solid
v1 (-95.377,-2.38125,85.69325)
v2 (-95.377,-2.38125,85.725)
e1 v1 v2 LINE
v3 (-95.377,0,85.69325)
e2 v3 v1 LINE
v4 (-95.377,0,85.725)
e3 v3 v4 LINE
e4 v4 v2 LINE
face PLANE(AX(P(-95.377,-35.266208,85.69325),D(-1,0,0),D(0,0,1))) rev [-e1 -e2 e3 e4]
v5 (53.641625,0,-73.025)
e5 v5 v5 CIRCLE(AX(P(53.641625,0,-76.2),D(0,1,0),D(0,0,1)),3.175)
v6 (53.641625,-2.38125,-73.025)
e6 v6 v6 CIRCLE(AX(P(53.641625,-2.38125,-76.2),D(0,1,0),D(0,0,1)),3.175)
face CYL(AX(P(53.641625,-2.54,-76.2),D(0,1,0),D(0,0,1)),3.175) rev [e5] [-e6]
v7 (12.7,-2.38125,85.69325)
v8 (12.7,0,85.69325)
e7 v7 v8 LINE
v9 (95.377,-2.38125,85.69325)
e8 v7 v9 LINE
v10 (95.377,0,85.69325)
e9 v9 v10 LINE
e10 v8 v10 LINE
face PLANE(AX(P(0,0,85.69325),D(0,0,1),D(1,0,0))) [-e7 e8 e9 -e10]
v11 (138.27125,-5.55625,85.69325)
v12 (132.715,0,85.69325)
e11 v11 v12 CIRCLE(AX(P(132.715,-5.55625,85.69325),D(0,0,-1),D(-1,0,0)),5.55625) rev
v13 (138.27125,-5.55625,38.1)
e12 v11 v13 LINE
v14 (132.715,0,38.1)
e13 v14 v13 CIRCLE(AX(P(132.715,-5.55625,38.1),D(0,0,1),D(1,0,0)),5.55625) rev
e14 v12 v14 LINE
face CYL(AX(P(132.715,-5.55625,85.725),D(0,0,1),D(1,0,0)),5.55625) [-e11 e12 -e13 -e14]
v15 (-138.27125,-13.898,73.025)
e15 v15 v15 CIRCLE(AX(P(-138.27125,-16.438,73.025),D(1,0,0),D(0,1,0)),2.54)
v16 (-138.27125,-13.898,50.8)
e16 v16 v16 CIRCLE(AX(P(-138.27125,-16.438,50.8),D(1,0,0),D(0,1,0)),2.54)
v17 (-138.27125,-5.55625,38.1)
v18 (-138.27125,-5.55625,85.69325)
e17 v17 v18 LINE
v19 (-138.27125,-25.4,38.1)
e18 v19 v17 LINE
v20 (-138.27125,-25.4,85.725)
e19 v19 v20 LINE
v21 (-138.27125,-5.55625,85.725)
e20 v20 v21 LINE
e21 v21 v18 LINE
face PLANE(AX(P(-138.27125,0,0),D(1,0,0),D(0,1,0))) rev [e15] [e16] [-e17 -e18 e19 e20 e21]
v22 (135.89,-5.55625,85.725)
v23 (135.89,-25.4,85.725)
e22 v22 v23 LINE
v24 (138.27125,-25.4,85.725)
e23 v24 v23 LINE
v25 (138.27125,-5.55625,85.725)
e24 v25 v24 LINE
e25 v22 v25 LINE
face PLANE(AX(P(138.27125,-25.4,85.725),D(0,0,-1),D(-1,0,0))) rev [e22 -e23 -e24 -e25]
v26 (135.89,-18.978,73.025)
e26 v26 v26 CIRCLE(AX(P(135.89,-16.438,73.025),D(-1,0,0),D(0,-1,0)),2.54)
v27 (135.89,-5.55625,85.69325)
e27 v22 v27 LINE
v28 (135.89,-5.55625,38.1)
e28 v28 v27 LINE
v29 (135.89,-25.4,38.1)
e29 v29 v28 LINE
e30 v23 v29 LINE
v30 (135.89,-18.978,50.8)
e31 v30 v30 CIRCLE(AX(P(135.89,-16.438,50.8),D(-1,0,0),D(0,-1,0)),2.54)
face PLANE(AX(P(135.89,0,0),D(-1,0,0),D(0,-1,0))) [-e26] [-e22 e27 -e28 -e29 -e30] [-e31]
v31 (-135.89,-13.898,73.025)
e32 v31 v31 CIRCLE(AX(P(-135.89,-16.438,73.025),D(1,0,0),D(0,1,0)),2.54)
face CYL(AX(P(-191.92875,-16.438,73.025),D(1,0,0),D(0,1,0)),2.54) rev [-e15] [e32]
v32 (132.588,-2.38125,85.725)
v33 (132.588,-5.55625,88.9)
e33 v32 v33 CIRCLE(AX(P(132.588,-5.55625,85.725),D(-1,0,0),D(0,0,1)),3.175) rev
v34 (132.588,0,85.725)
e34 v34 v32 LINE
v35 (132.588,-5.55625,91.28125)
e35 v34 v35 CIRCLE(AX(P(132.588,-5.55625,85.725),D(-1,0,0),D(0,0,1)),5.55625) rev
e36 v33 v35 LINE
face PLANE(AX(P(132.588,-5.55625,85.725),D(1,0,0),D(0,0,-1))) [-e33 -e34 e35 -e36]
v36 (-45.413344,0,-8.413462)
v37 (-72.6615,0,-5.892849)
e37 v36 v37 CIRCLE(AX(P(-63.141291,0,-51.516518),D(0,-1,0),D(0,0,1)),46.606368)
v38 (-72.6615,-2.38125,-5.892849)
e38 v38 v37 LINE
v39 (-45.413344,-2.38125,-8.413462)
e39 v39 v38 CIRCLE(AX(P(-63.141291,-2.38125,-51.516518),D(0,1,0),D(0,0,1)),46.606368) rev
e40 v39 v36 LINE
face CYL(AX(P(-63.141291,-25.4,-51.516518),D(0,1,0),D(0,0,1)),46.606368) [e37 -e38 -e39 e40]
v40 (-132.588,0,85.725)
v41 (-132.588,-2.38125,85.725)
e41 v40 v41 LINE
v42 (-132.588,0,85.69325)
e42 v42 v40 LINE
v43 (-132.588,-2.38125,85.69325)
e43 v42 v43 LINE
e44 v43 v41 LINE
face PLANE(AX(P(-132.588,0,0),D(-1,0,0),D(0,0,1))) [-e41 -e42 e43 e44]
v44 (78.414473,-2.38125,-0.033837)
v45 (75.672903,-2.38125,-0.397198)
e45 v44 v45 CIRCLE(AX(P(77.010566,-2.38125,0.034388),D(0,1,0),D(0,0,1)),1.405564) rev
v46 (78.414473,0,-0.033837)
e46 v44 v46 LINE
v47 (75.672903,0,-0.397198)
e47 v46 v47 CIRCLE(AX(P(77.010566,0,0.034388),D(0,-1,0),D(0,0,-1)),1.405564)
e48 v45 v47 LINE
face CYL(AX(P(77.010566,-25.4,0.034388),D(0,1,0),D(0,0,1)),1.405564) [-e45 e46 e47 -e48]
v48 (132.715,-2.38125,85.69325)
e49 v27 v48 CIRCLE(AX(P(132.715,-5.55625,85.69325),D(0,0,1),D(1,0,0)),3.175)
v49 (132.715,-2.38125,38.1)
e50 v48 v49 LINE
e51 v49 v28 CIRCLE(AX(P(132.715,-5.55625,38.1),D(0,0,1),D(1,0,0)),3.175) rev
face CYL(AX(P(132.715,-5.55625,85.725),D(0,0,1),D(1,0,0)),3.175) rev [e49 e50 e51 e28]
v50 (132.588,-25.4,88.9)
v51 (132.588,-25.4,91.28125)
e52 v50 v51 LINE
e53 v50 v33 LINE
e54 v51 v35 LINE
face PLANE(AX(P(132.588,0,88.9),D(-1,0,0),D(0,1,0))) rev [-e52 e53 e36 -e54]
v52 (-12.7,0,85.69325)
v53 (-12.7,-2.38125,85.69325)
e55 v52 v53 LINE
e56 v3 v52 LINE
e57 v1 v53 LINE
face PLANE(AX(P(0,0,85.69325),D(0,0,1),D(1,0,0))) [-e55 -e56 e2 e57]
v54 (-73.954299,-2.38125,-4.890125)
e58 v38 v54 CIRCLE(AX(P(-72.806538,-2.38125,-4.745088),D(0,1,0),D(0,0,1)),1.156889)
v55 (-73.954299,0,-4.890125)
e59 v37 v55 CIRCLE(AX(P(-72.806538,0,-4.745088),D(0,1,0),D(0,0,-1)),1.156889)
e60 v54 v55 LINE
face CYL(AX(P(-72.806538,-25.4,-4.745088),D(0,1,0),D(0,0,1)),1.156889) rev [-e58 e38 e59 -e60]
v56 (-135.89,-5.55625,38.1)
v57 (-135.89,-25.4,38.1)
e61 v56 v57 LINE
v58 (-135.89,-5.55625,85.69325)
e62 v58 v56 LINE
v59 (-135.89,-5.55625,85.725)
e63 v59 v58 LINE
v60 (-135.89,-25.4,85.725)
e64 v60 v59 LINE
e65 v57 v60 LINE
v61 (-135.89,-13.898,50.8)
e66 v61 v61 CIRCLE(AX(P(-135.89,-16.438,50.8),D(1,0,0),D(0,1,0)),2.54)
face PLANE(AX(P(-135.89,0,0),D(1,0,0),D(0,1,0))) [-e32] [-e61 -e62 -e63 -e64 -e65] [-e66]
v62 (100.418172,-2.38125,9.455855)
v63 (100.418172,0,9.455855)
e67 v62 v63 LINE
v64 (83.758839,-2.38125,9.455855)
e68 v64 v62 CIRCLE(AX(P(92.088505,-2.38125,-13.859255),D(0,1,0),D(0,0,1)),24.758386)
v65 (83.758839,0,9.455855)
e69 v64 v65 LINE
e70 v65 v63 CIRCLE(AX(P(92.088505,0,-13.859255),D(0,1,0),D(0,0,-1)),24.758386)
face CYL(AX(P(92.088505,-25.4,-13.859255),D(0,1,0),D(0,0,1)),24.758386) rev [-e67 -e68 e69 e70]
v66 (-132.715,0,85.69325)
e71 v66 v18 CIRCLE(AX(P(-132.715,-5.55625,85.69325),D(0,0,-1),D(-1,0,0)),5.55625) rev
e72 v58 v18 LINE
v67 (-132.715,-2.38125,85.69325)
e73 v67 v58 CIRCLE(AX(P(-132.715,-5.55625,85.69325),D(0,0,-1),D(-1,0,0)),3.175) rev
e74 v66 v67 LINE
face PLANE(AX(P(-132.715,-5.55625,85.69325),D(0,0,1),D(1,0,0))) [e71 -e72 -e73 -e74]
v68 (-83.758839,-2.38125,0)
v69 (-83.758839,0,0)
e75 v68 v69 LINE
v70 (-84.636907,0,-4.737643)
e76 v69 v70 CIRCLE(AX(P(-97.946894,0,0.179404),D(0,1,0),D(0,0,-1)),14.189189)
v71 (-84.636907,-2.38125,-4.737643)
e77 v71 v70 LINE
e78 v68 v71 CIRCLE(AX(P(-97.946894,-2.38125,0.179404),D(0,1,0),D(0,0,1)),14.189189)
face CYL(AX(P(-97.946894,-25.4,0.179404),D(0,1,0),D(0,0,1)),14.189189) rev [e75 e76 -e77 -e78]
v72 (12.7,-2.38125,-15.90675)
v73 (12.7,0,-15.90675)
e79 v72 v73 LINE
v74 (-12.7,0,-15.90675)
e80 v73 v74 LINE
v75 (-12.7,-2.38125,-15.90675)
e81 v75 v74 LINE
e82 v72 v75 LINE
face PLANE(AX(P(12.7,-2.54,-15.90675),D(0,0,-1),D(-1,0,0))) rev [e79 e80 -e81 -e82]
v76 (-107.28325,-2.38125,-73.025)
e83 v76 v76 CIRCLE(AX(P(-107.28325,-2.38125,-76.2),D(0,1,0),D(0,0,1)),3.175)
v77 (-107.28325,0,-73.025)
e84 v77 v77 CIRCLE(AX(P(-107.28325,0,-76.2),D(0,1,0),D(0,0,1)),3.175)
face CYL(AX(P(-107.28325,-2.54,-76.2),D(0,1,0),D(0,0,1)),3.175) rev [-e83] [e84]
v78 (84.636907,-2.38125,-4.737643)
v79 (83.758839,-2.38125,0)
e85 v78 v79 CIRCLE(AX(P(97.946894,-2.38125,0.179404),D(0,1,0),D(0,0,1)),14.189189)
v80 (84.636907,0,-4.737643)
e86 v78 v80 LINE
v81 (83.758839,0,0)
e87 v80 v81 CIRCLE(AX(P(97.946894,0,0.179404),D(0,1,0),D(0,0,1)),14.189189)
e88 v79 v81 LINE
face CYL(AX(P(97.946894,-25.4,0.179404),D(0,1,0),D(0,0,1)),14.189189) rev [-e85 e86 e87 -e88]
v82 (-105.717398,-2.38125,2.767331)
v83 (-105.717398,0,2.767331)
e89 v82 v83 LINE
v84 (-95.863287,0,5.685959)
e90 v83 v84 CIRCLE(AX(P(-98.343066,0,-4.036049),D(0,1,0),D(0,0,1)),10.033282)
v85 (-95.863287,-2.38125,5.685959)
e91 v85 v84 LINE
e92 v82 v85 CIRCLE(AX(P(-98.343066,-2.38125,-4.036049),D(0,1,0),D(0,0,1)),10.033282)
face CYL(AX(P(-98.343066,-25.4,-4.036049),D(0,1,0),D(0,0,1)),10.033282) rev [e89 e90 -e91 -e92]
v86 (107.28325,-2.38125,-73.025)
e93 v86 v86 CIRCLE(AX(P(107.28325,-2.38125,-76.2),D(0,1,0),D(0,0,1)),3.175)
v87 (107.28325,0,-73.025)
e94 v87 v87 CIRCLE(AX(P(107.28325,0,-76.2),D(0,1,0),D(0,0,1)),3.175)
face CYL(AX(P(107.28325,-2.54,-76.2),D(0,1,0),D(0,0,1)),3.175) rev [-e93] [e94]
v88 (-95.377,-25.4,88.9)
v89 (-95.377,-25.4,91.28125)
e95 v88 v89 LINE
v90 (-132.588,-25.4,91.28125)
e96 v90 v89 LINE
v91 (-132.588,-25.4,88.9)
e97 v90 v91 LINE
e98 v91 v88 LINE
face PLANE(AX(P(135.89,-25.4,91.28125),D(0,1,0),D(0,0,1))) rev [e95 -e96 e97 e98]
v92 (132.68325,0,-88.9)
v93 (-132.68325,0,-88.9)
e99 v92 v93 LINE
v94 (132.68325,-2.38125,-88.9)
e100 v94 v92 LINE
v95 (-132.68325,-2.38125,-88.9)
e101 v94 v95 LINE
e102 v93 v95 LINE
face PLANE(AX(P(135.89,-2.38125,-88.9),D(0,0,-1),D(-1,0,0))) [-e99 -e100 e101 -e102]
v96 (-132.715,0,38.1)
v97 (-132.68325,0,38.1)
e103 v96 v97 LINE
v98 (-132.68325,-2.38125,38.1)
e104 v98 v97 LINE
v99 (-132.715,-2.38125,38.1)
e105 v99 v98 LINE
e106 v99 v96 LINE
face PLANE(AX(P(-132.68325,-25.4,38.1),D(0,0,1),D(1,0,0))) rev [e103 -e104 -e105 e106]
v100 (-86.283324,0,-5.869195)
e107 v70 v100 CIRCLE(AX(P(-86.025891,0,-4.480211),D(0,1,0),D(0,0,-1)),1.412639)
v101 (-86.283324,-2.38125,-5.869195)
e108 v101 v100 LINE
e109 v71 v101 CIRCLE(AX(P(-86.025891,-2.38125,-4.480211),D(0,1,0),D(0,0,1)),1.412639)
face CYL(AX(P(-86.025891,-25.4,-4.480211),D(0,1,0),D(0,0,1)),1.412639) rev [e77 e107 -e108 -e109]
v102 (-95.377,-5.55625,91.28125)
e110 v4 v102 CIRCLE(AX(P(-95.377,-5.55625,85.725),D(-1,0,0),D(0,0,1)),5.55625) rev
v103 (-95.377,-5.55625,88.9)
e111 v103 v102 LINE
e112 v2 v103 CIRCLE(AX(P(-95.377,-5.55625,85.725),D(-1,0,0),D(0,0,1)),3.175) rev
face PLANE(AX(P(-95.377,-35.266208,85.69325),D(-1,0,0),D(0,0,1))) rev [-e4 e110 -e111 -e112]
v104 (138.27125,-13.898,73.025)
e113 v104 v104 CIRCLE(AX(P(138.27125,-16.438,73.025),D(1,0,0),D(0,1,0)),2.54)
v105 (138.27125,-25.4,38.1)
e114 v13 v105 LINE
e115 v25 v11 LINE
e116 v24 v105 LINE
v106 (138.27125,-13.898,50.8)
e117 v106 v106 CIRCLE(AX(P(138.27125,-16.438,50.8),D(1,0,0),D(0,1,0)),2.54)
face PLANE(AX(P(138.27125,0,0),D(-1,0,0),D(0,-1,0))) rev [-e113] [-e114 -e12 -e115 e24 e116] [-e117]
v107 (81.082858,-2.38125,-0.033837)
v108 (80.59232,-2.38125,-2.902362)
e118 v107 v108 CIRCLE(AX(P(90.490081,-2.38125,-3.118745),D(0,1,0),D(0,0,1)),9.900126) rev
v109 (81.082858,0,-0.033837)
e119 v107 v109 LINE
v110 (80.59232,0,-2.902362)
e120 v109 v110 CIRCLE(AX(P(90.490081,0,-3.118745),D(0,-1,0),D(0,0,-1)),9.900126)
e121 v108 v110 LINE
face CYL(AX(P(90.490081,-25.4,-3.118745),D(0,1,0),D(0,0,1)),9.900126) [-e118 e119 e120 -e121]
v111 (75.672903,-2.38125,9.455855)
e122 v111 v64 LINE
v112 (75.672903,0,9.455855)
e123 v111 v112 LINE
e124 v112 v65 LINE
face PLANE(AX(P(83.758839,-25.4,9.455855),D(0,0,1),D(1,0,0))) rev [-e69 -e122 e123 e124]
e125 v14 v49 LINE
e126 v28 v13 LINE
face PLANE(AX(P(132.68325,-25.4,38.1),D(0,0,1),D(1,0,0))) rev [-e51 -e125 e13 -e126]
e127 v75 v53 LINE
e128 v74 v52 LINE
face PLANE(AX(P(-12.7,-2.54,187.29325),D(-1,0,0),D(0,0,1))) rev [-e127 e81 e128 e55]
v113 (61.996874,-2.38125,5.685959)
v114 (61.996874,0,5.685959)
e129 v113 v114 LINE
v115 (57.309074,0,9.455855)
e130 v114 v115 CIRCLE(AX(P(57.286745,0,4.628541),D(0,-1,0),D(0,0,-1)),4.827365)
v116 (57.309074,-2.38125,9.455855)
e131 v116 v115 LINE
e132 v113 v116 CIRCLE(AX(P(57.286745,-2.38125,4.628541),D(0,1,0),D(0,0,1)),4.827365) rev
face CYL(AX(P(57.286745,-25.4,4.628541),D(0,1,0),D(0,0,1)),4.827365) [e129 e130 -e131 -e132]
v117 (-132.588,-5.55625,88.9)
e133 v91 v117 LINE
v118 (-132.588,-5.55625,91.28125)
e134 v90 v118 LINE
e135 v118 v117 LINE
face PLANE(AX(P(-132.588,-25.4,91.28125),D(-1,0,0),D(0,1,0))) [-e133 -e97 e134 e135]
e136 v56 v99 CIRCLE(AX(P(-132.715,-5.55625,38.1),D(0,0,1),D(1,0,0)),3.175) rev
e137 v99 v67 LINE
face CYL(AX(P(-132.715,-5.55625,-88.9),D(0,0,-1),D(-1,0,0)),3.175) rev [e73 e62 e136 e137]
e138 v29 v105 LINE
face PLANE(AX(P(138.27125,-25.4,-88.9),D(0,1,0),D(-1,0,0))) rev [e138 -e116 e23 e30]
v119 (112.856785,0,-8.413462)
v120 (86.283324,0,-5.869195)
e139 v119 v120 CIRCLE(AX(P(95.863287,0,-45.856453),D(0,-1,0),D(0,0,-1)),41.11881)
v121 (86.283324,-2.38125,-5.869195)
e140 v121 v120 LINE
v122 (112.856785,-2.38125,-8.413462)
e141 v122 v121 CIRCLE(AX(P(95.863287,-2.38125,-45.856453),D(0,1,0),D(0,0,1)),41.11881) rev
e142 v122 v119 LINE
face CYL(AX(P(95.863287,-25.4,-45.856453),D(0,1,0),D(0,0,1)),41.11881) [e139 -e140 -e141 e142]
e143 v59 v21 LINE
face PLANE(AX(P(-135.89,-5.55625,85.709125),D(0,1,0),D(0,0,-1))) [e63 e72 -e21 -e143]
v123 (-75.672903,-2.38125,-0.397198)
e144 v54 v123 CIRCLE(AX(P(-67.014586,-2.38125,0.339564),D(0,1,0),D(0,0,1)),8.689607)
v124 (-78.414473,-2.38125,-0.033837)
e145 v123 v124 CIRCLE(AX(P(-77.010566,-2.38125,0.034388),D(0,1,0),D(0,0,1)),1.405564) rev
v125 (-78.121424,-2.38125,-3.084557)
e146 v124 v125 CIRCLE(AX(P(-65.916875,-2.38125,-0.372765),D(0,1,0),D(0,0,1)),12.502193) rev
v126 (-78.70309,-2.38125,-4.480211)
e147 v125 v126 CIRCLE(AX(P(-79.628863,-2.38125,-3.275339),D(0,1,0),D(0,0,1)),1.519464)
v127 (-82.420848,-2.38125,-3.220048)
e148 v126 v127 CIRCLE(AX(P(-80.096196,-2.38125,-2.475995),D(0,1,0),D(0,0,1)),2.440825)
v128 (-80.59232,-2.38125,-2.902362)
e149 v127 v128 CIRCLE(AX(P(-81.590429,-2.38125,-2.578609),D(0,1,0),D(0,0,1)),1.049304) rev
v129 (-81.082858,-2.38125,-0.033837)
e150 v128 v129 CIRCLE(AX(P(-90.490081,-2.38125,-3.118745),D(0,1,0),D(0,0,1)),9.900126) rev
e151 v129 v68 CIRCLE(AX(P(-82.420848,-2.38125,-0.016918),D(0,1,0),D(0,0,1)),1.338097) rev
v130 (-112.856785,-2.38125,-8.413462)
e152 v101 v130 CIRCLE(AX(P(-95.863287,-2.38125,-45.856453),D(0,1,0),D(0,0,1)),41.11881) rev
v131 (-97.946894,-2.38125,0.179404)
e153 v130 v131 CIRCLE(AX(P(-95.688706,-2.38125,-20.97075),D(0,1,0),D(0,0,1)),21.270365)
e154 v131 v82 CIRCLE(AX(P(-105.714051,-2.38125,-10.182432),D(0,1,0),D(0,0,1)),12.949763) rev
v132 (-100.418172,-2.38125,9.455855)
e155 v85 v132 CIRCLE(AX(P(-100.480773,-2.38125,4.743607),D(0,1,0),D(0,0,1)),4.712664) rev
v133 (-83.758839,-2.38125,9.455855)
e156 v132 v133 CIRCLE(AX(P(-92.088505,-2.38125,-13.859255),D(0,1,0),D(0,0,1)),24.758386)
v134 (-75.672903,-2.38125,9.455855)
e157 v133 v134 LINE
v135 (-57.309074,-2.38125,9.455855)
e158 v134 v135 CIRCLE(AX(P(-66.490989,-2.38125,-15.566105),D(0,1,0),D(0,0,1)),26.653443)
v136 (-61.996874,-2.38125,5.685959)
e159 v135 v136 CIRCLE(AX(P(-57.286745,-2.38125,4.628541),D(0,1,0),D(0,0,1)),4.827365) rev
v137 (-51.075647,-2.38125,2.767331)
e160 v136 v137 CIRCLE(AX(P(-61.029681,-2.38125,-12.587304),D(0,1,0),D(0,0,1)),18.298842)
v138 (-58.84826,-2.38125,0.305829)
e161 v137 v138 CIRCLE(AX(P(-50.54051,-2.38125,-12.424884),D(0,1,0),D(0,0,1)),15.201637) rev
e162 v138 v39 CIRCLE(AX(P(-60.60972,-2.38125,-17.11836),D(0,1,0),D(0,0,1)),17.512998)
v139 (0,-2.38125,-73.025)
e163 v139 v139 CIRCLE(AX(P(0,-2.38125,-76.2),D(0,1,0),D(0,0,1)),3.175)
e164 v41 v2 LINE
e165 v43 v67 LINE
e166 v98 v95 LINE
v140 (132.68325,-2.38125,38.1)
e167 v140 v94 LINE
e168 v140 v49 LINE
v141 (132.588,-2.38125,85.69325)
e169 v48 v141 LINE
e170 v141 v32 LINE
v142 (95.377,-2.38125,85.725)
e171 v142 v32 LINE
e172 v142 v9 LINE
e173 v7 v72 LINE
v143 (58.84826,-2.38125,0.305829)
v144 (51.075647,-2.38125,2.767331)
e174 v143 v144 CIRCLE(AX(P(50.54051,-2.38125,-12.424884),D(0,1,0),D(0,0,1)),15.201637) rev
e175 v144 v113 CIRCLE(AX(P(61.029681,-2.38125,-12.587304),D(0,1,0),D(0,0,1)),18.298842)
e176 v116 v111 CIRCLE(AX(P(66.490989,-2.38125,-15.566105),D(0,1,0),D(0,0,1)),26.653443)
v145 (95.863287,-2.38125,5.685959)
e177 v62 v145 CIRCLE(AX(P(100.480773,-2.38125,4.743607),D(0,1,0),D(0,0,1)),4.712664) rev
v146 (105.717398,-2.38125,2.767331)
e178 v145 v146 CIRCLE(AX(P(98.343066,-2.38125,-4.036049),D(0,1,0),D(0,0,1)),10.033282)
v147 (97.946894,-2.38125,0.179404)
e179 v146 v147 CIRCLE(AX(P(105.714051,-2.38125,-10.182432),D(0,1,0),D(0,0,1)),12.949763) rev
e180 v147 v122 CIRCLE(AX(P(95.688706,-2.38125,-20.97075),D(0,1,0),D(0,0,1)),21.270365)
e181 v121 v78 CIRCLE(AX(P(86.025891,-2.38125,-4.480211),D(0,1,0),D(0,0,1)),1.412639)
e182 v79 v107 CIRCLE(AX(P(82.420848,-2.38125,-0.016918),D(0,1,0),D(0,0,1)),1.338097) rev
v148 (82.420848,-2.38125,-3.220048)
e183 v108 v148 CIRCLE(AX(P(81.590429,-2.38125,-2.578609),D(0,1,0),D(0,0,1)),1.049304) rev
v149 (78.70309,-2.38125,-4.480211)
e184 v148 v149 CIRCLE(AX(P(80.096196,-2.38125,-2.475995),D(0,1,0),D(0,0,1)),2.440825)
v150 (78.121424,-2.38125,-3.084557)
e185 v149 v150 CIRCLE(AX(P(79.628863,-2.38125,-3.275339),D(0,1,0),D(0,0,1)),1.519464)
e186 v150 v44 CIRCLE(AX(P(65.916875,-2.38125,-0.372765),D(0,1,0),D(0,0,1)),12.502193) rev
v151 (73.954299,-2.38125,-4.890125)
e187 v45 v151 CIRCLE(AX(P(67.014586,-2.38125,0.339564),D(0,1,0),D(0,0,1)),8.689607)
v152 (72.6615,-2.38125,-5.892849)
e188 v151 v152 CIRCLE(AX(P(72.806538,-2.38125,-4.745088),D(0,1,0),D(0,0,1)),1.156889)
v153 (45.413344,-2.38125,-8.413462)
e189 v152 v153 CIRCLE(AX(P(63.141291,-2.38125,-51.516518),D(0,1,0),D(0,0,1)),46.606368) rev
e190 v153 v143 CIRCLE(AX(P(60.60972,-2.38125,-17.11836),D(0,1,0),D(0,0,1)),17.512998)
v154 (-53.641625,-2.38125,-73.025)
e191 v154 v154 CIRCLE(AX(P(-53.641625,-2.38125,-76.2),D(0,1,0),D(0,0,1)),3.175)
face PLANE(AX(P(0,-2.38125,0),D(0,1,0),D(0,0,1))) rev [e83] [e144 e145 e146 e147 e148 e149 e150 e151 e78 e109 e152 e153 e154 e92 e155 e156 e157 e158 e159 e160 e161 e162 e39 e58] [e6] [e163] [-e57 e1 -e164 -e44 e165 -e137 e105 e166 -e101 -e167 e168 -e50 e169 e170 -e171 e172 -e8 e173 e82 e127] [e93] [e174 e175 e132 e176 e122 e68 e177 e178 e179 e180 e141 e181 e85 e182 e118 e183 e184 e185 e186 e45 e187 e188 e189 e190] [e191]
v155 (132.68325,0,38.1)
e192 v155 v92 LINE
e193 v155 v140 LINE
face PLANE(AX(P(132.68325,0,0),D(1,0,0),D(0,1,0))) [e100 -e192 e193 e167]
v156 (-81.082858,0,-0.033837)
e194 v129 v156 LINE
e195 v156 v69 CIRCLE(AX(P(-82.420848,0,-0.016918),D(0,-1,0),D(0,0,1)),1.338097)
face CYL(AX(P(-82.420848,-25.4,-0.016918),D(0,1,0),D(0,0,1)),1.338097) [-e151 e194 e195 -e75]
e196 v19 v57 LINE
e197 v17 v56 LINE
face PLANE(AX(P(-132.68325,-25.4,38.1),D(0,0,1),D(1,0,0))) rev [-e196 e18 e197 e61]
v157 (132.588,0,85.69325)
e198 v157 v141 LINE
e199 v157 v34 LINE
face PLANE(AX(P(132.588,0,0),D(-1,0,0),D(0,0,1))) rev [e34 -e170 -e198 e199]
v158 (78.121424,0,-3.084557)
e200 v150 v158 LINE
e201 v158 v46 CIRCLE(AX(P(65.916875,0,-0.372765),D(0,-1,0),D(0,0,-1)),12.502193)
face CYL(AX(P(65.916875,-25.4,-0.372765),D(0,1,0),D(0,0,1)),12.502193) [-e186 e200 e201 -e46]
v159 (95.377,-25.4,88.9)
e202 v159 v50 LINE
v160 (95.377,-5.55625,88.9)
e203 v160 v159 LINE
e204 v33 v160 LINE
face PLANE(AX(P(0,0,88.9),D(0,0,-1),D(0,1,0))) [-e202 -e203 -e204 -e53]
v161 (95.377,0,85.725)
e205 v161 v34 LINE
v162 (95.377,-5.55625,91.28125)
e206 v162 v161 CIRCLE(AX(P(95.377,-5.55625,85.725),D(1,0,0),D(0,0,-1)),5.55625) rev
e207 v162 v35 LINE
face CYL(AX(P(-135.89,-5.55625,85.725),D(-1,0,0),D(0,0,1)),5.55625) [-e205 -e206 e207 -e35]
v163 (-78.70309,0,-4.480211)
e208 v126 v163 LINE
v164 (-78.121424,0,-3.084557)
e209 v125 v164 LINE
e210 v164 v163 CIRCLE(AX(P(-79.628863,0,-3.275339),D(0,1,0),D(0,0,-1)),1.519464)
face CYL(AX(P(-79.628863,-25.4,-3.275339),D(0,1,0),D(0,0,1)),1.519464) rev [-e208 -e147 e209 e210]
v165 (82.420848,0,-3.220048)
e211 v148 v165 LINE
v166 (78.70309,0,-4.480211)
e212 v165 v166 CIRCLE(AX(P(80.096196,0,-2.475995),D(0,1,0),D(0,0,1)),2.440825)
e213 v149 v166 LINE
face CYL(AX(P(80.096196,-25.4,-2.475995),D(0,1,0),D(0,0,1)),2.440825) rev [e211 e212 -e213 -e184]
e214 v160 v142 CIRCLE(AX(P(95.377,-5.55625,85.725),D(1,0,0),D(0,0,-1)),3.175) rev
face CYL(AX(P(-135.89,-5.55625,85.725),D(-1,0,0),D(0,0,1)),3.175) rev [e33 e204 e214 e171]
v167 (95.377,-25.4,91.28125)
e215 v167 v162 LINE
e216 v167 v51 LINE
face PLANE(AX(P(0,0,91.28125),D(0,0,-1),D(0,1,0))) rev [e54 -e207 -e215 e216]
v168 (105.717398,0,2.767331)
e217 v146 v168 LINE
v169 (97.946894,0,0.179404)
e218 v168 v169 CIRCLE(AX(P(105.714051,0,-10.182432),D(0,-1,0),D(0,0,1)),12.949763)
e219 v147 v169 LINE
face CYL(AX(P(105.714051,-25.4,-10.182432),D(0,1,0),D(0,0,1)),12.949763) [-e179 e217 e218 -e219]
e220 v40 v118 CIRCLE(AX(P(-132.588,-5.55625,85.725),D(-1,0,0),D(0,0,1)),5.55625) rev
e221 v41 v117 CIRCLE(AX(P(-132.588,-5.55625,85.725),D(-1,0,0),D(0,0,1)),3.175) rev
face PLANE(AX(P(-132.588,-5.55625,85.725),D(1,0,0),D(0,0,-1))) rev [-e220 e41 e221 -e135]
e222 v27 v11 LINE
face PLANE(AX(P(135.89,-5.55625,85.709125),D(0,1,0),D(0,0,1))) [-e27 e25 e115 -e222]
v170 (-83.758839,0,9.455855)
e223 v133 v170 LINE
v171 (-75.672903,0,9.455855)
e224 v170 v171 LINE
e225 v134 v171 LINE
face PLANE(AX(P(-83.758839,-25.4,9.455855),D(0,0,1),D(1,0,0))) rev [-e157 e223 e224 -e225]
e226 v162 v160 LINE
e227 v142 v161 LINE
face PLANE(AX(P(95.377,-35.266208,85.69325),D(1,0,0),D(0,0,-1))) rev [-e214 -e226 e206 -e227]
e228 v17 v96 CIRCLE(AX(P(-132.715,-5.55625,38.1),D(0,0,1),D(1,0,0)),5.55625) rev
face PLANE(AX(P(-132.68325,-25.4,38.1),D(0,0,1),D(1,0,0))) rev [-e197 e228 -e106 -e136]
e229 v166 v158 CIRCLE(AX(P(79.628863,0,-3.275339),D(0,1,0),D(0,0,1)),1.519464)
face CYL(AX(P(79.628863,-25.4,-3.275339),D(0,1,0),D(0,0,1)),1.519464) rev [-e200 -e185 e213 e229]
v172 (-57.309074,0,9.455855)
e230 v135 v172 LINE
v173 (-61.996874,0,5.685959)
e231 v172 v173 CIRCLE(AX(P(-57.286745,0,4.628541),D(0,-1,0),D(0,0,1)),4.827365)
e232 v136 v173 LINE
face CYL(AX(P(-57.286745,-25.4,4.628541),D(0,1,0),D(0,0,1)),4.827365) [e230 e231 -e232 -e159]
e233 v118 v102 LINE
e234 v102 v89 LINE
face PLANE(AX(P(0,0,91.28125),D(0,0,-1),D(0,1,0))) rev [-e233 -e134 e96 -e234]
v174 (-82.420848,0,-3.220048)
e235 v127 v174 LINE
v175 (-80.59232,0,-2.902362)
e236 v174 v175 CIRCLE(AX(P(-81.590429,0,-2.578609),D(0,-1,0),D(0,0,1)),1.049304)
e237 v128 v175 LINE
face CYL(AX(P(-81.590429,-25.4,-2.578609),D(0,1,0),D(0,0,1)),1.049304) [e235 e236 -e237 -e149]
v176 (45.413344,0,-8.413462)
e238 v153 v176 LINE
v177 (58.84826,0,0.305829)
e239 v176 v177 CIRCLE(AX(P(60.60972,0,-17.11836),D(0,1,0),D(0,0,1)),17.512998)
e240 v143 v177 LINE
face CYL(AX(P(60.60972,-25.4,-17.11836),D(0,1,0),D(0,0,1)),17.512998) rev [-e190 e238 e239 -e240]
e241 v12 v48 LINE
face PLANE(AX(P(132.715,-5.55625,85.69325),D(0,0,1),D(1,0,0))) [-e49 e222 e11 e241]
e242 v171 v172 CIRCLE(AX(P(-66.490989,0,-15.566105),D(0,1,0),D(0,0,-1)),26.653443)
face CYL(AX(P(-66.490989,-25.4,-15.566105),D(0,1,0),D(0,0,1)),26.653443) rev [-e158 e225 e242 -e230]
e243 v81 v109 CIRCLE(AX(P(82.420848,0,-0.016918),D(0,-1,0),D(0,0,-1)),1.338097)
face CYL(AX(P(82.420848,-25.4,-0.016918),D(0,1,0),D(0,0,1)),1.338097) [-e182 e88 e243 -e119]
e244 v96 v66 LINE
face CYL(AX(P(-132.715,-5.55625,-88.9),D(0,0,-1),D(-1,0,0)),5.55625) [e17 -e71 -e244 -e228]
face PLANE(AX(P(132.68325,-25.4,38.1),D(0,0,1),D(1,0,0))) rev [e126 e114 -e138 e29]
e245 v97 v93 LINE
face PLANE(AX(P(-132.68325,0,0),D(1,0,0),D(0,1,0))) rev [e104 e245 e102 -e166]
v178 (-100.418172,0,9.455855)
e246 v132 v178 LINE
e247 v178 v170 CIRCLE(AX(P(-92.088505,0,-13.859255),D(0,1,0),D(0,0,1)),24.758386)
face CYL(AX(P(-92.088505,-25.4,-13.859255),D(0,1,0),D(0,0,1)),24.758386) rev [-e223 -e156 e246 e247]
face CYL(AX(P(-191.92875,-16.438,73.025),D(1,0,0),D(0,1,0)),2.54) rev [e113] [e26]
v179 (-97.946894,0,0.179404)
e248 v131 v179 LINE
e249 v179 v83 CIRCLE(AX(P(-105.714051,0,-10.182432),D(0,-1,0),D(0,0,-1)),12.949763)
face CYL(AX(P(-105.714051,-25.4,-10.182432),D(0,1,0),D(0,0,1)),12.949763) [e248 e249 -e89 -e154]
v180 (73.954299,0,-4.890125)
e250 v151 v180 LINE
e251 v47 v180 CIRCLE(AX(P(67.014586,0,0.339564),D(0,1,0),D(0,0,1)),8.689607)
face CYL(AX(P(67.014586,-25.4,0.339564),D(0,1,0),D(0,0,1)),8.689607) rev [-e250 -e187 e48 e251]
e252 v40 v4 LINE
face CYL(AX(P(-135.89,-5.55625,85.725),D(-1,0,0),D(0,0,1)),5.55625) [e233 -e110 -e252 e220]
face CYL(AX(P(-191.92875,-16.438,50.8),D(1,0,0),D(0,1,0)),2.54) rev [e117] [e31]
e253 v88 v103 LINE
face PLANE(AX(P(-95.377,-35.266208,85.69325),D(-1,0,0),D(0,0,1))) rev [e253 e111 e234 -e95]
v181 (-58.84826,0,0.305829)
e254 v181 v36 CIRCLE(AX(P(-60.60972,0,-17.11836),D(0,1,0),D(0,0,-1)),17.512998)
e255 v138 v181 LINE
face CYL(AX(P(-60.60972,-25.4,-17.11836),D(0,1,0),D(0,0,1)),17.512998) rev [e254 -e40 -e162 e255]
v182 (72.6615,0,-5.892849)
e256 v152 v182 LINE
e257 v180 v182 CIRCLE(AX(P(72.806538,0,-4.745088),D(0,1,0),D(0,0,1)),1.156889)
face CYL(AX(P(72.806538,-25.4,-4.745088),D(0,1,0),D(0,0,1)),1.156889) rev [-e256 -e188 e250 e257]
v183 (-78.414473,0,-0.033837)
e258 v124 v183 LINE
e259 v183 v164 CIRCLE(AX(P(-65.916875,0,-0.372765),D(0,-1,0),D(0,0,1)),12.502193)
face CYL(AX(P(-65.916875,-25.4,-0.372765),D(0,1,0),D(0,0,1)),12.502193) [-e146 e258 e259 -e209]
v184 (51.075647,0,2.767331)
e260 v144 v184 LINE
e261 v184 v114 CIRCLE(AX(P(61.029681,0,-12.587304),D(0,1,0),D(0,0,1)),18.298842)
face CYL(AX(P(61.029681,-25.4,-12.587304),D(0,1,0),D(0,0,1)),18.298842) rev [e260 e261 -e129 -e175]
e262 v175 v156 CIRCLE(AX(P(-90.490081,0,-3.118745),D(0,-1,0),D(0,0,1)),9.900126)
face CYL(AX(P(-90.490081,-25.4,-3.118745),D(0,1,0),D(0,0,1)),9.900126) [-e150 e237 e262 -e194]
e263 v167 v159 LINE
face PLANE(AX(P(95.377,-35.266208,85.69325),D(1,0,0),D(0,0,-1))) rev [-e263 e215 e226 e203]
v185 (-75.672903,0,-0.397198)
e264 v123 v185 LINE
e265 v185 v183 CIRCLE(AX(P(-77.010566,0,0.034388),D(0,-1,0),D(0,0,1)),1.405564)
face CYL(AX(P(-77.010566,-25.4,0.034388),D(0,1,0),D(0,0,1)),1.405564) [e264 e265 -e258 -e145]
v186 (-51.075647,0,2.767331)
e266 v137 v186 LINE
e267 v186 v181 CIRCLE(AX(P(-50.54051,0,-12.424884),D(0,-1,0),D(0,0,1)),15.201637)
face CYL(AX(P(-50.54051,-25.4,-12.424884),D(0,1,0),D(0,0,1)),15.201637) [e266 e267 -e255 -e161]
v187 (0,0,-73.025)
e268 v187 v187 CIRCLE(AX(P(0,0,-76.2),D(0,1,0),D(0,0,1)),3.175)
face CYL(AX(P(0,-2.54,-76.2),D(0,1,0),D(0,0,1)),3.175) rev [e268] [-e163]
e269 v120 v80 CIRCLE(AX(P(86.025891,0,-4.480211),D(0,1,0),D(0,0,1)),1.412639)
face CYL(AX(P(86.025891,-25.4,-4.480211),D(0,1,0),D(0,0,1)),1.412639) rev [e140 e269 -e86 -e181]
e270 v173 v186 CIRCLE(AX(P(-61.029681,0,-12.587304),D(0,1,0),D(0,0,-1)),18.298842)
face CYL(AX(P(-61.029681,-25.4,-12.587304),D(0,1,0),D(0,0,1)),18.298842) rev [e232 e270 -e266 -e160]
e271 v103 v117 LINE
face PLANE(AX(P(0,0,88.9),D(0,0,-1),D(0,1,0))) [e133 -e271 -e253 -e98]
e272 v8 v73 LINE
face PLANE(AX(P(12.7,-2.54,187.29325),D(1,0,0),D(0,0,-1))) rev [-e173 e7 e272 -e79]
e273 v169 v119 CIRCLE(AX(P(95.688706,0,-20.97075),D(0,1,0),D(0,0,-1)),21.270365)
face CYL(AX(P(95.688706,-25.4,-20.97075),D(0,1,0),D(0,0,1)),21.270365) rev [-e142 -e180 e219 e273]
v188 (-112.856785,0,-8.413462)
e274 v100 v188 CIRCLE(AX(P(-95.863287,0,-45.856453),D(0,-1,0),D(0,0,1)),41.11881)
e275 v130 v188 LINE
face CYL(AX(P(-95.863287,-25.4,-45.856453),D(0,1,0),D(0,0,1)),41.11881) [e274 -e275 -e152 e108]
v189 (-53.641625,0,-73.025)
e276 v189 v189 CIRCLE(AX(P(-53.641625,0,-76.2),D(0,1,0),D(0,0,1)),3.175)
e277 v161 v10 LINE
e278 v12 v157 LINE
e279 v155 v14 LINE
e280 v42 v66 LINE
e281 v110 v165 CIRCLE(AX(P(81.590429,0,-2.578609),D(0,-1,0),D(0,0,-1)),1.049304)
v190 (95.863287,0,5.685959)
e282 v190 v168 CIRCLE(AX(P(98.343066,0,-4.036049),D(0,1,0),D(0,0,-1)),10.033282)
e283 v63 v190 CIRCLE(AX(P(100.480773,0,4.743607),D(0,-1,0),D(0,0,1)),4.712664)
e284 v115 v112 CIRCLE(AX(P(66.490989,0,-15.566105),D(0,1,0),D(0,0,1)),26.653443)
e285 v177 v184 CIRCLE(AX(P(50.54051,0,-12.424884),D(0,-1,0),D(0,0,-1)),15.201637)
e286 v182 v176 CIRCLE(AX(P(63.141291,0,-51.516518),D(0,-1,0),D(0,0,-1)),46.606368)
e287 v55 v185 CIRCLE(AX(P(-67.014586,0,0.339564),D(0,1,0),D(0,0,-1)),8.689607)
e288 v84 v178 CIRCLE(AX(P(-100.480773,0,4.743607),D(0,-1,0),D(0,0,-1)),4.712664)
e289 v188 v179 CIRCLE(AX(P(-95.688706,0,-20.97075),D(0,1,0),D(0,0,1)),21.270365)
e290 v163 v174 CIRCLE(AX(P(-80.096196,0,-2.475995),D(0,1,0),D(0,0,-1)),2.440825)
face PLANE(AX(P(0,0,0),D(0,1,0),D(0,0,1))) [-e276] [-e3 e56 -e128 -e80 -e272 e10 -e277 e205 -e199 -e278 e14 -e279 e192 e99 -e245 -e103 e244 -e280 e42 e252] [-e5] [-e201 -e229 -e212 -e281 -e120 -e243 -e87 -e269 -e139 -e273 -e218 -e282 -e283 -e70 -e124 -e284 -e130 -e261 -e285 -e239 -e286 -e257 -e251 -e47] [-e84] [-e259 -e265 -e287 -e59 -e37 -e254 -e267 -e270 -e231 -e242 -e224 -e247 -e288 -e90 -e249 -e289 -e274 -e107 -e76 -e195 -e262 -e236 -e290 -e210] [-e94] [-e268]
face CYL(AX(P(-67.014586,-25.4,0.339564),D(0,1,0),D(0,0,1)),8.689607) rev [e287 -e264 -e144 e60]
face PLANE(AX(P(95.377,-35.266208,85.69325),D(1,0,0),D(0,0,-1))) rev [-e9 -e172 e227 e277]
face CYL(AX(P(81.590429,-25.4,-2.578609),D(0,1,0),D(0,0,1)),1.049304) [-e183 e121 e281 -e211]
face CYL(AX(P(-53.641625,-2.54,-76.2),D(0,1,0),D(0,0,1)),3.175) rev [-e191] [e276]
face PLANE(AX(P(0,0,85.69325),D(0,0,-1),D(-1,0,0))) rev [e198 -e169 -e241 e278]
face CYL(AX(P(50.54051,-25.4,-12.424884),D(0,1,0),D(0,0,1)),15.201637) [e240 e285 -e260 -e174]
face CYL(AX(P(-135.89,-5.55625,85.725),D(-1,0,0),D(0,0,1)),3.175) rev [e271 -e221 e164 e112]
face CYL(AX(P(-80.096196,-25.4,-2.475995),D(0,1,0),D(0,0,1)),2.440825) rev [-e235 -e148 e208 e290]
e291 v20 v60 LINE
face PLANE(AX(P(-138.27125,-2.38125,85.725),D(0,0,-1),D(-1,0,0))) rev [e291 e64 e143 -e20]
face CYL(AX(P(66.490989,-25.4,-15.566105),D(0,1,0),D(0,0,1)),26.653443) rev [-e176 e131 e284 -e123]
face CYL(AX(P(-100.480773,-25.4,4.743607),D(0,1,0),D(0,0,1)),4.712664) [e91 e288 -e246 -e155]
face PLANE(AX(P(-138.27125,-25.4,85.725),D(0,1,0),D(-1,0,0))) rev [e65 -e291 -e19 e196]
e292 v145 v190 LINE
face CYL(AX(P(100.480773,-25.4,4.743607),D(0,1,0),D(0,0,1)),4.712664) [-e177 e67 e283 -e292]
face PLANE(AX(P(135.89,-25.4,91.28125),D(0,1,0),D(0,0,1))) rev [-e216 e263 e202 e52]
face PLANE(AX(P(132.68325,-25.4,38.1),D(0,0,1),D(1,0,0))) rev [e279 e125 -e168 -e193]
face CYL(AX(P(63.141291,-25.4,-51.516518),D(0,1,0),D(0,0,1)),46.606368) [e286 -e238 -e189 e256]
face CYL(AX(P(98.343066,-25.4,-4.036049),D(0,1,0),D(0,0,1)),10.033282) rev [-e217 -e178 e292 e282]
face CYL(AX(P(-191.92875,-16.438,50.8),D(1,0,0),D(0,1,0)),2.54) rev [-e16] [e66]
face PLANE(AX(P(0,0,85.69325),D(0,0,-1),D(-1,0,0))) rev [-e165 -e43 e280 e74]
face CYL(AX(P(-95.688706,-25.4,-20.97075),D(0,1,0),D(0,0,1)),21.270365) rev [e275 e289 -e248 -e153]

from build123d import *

# Parameters (mm, degrees)
SKETCH1_W                    = 271.78
SKETCH1_H                    = 177.8
BASE_FLANGE1_DEPTH           = 2.38125
EDGE_FLANGE1_STRIP_W         = 15.875
EDGE_FLANGE1_STRIP_H         = 2.38125
EDGE_FLANGE1_STRIP_CUT_DEPTH = 271.78
EDGE_FLANGE1_DEPTH           = 271.78
EDGE_FLANGE2_STRIP_W         = 15.875
EDGE_FLANGE2_STRIP_H         = 2.38125
EDGE_FLANGE2_STRIP_CUT_DEPTH = 174.625
EDGE_FLANGE2_DEPTH           = 174.625
SKETCH14_W                   = 127
SKETCH14_H                   = 30.097595223
CUT_EXTRUDE1_DEPTH           = 5.588
EDGE_FLANGE3_STRIP_W         = 15.875
EDGE_FLANGE3_STRIP_H         = 2.38125
EDGE_FLANGE3_STRIP_CUT_DEPTH = 174.625
EDGE_FLANGE3_DEPTH           = 174.625
SKETCH18_W                   = 127
SKETCH18_H                   = 45.504454023
CUT_EXTRUDE2_DEPTH           = 5.588
CUT_EXTRUDE3_START           = -3.302
CUT_EXTRUDE3_DEPTH           = 5.68325
CUT_EXTRUDE4_START           = -3.302
CUT_EXTRUDE4_DEPTH           = 5.68325
SKETCH24_W                   = 190.754
SKETCH24_H                   = 70.532416994
CUT_EXTRUDE5_DEPTH           = 5.588
SKETCH25_W                   = 25.4
SKETCH25_H                   = 203.2
CUT_EXTRUDE6_DEPTH           = 2.54
CUT_EXTRUDE7_DEPTH           = 168.619704027
SKETCH28_R                   = 3.175
CUT_EXTRUDE8_DEPTH           = 2.54
SKETCH29_R                   = 2.54
CUT_EXTRUDE9_DEPTH           = 330.2


# Read off the part's stored shape, not the designer's step: Cut-Extrude3, Cut-Extrude4
# Sheet-metal steps are written as plain solids
with BuildPart() as part:
    # Sketch1 → Base-Flange1 (new body)
    with BuildSketch(Plane(origin=(0, 0, 0), x_dir=(1, 0, 0), z_dir=(0, 1, 0))):
        Rectangle(SKETCH1_W, SKETCH1_H)
    extrude(amount=-BASE_FLANGE1_DEPTH)

    # Edge-Flange1 strip (across the edge) → Edge-Flange1 strip cut (cut)
    with BuildSketch(Plane(origin=(135.89, -2.38125, 88.9), x_dir=(0, 0, -1), z_dir=(-1, 0, 0))):
        with Locations((-4.7625, -1.190625)):
            Rectangle(EDGE_FLANGE1_STRIP_W, EDGE_FLANGE1_STRIP_H)
    extrude(amount=EDGE_FLANGE1_STRIP_CUT_DEPTH, mode=Mode.SUBTRACT)

    # Edge-Flange1 section (across the edge) → Edge-Flange1 (add)
    with BuildSketch(Plane(origin=(135.89, -2.38125, 88.9), x_dir=(0, 0, -1), z_dir=(-1, 0, 0))):
        with BuildLine():
            Line((-2.38125, 3.175), (-2.38125, 23.01875))
            Line((-2.38125, 23.01875), (0, 23.01875))
            Line((0, 23.01875), (0, 3.175))
            ThreePointArc((0, 3.175), (0.92993597, 0.92993597), (3.175, 0))
            Line((3.175, 0), (3.175, -2.38125))
            ThreePointArc((3.175, -2.38125), (-0.753862053, -0.753862053), (-2.38125, 3.175))
        make_face()
    extrude(amount=EDGE_FLANGE1_DEPTH)

    # Edge-Flange2 strip (across the edge) → Edge-Flange2 strip cut (cut)
    with BuildSketch(Plane(origin=(135.89, -2.38125, -88.9), x_dir=(-1, 0, 0), z_dir=(0, 0, 1))):
        with Locations((-4.7625, -1.190625)):
            Rectangle(EDGE_FLANGE2_STRIP_W, EDGE_FLANGE2_STRIP_H)
    extrude(amount=EDGE_FLANGE2_STRIP_CUT_DEPTH, mode=Mode.SUBTRACT)

    # Edge-Flange2 section (across the edge) → Edge-Flange2 (add)
    with BuildSketch(Plane(origin=(135.89, -2.38125, -88.9), x_dir=(-1, 0, 0), z_dir=(0, 0, 1))):
        with BuildLine():
            Line((-2.38125, 3.175), (-2.38125, 23.01875))
            Line((-2.38125, 23.01875), (0, 23.01875))
            Line((0, 23.01875), (0, 3.175))
            ThreePointArc((0, 3.175), (0.92993597, 0.92993597), (3.175, 0))
            Line((3.175, 0), (3.175, -2.38125))
            ThreePointArc((3.175, -2.38125), (-0.753862053, -0.753862053), (-2.38125, 3.175))
        make_face()
    extrude(amount=EDGE_FLANGE2_DEPTH)

    # Sketch14 → Cut-Extrude1 (cut)
    with BuildSketch(Plane(origin=(138.27125, 0, 0), x_dir=(0, 0, -1), z_dir=(1, 0, 0))):
        with Locations((25.4, -10.351202389)):
            Rectangle(SKETCH14_W, SKETCH14_H)
    extrude(amount=-CUT_EXTRUDE1_DEPTH, mode=Mode.SUBTRACT)

    # Edge-Flange3 strip (across the edge) → Edge-Flange3 strip cut (cut)
    with BuildSketch(Plane(origin=(-135.89, -2.38125, 85.725), x_dir=(1, 0, 0), z_dir=(0, 0, -1))):
        with Locations((-4.7625, -1.190625)):
            Rectangle(EDGE_FLANGE3_STRIP_W, EDGE_FLANGE3_STRIP_H)
    extrude(amount=EDGE_FLANGE3_STRIP_CUT_DEPTH, mode=Mode.SUBTRACT)

    # Edge-Flange3 section (across the edge) → Edge-Flange3 (add)
    with BuildSketch(Plane(origin=(-135.89, -2.38125, 85.725), x_dir=(1, 0, 0), z_dir=(0, 0, -1))):
        with BuildLine():
            Line((-2.38125, 3.175), (-2.38125, 23.01875))
            Line((-2.38125, 23.01875), (0, 23.01875))
            Line((0, 23.01875), (0, 3.175))
            ThreePointArc((0, 3.175), (0.92993597, 0.92993597), (3.175, 0))
            Line((3.175, 0), (3.175, -2.38125))
            ThreePointArc((3.175, -2.38125), (-0.753862053, -0.753862053), (-2.38125, 3.175))
        make_face()
    extrude(amount=EDGE_FLANGE3_DEPTH)

    # Sketch18 → Cut-Extrude2 (cut)
    with BuildSketch(Plane.ZY.offset(138.27125)):
        with Locations((-25.4, -2.647772988)):
            Rectangle(SKETCH18_W, SKETCH18_H)
    extrude(amount=-CUT_EXTRUDE2_DEPTH, mode=Mode.SUBTRACT)

    # Cut-Extrude3 outline → Cut-Extrude3 (cut)
    with BuildSketch(Plane.ZY.offset(135.89).offset(CUT_EXTRUDE3_START)):
        with BuildLine():
            Line((85.725, 0), (85.69325, 0))
            Line((85.69325, 0), (85.69325, -5.55625))
            Line((85.69325, -5.55625), (85.725, -5.55625))
            Line((85.725, -5.55625), (85.725, -2.38125))
            ThreePointArc((85.725, -2.38125), (87.97006403, -3.31118597), (88.9, -5.55625))
            Line((88.9, -5.55625), (88.9, -25.4))
            Line((88.9, -25.4), (91.28125, -25.4))
            Line((91.28125, -25.4), (91.28125, -5.55625))
            ThreePointArc((91.28125, -5.55625), (89.653862053, -1.627387947), (85.725, 0))
        make_face()
    extrude(amount=CUT_EXTRUDE3_DEPTH, mode=Mode.SUBTRACT)

    # Cut-Extrude4 outline → Cut-Extrude4 (cut)
    with BuildSketch(Plane(origin=(135.89, 0, 0), x_dir=(0, 0, -1), z_dir=(1, 0, 0)).offset(CUT_EXTRUDE4_START)):
        with BuildLine():
            Line((-85.69325, 0), (-85.725, 0))
            ThreePointArc((-85.725, 0), (-89.653862053, -1.627387947), (-91.28125, -5.55625))
            Line((-91.28125, -5.55625), (-91.28125, -25.4))
            Line((-91.28125, -25.4), (-88.9, -25.4))
            Line((-88.9, -25.4), (-88.9, -5.55625))
            ThreePointArc((-88.9, -5.55625), (-87.97006403, -3.31118597), (-85.725, -2.38125))
            Line((-85.725, -2.38125), (-85.725, -5.55625))
            Line((-85.725, -5.55625), (-85.69325, -5.55625))
            Line((-85.69325, -5.55625), (-85.69325, 0))
        make_face()
    extrude(amount=CUT_EXTRUDE4_DEPTH, mode=Mode.SUBTRACT)

    # Sketch24 → Cut-Extrude5 (cut)
    with BuildSketch(Plane.XY.offset(91.28125)):
        Rectangle(SKETCH24_W, SKETCH24_H)
    extrude(amount=-CUT_EXTRUDE5_DEPTH, mode=Mode.SUBTRACT)

    # Sketch25 → Cut-Extrude6 (cut)
    with BuildSketch(Plane(origin=(0, 0, 0), x_dir=(1, 0, 0), z_dir=(0, 1, 0))):
        with Locations((0, -85.69325)):
            Rectangle(SKETCH25_W, SKETCH25_H)
    extrude(amount=-CUT_EXTRUDE6_DEPTH, mode=Mode.SUBTRACT)

    # Sketch27 → Cut-Extrude7 (cut, through all)
    with BuildSketch(Plane(origin=(0, 0, 0), x_dir=(1, 0, 0), z_dir=(0, 1, 0))):
        with BuildLine():
            Line((-83.758838792, -9.45585461), (-75.67290259, -9.45585461))
            ThreePointArc((-75.67290259, -9.45585461), (-66.490988533, -11.087337706), (-57.309074476, -9.45585461))
            ThreePointArc((-57.309074476, -9.45585461), (-60.311983549, -8.390373583), (-61.996874262, -5.685959414))
            ThreePointArc((-61.996874262, -5.685959414), (-56.305231118, -5.091134548), (-51.075646545, -2.767330875))
            ThreePointArc((-51.075646545, -2.767330875), (-55.130053613, -2.067384812), (-58.848260419, -0.305828877))
            ThreePointArc((-58.848260419, -0.305828877), (-51.075646545, 2.428004784), (-45.41334394, 8.413462337))
            ThreePointArc((-45.41334394, 8.413462337), (-58.848260419, 5.108292363), (-72.661500429, 5.892849412))
            ThreePointArc((-72.661500429, 5.892849412), (-73.515570568, 5.659234682), (-73.954298796, 4.890125335))
            ThreePointArc((-73.954298796, 4.890125335), (-75.13069526, 2.764954432), (-75.67290259, 0.397197853))
            ThreePointArc((-75.67290259, 0.397197853), (-76.825891015, -1.427766493), (-78.414472909, 0.033836989))
            ThreePointArc((-78.414472909, 0.033836989), (-78.361782981, 1.568210714), (-78.121423666, 3.084557099))
            ThreePointArc((-78.121423666, 3.084557099), (-78.226332012, 3.859871666), (-78.703089746, 4.480210688))
            ThreePointArc((-78.703089746, 4.480210688), (-80.87974367, 4.787634603), (-82.4208484, 3.22004793))
            ThreePointArc((-82.4208484, 3.22004793), (-81.410815763, 3.612426431), (-80.592319592, 2.902362466))
            ThreePointArc((-80.592319592, 2.902362466), (-80.7316121, 1.449976952), (-81.082858007, 0.033836989))
            ThreePointArc((-81.082858007, 0.033836989), (-82.403929905, -1.321071898), (-83.758838792, 0))
            ThreePointArc((-83.758838792, 0), (-83.995302952, 2.406365651), (-84.636907307, 4.737643154))
            ThreePointArc((-84.636907307, 4.737643154), (-85.225763559, 5.644402971), (-86.283323823, 5.869194738))
            ThreePointArc((-86.283323823, 5.869194738), (-99.782272929, 4.924826167), (-112.856785411, 8.413462337))
            ThreePointArc((-112.856785411, 8.413462337), (-106.309643061, 2.541856444), (-97.946894022, -0.179403782))
            ThreePointArc((-97.946894022, -0.179403782), (-101.622165605, -2.103854793), (-105.71739849, -2.767330875))
            ThreePointArc((-105.71739849, -2.767330875), (-101.192410266, -5.584137657), (-95.863287335, -5.685959414))
            ThreePointArc((-95.863287335, -5.685959414), (-97.475971718, -8.374084711), (-100.418171986, -9.45585461))
            ThreePointArc((-100.418171986, -9.45585461), (-92.088505389, -10.899131081), (-83.758838792, -9.45585461))
        make_face()
        with BuildLine():
            Line((83.758838792, -9.45585461), (75.67290259, -9.45585461))
            ThreePointArc((75.67290259, -9.45585461), (66.490988533, -11.087337706), (57.309074476, -9.45585461))
            ThreePointArc((57.309074476, -9.45585461), (60.311983549, -8.390373583), (61.996874262, -5.685959414))
            ThreePointArc((61.996874262, -5.685959414), (56.305231118, -5.091134548), (51.075646545, -2.767330875))
            ThreePointArc((51.075646545, -2.767330875), (55.130053613, -2.067384812), (58.848260419, -0.305828877))
            ThreePointArc((58.848260419, -0.305828877), (51.075646545, 2.428004784), (45.41334394, 8.413462337))
            ThreePointArc((45.41334394, 8.413462337), (58.848260419, 5.108292363), (72.661500429, 5.892849412))
            ThreePointArc((72.661500429, 5.892849412), (73.515570568, 5.659234682), (73.954298796, 4.890125335))
            ThreePointArc((73.954298796, 4.890125335), (75.13069526, 2.764954432), (75.67290259, 0.397197853))
            ThreePointArc((75.67290259, 0.397197853), (76.825891015, -1.427766493), (78.414472909, 0.033836989))
            ThreePointArc((78.414472909, 0.033836989), (78.361782981, 1.568210714), (78.121423666, 3.084557099))
            ThreePointArc((78.121423666, 3.084557099), (78.226332012, 3.859871666), (78.703089746, 4.480210688))
            ThreePointArc((78.703089746, 4.480210688), (80.87974367, 4.787634603), (82.4208484, 3.22004793))
            ThreePointArc((82.4208484, 3.22004793), (81.410815763, 3.612426431), (80.592319592, 2.902362466))
            ThreePointArc((80.592319592, 2.902362466), (80.7316121, 1.449976952), (81.082858007, 0.033836989))
            ThreePointArc((81.082858007, 0.033836989), (82.403929905, -1.321071898), (83.758838792, 0))
            ThreePointArc((83.758838792, 0), (83.995302952, 2.406365651), (84.636907307, 4.737643154))
            ThreePointArc((84.636907307, 4.737643154), (85.225763559, 5.644402971), (86.283323823, 5.869194738))
            ThreePointArc((86.283323823, 5.869194738), (99.782272929, 4.924826167), (112.856785411, 8.413462337))
            ThreePointArc((112.856785411, 8.413462337), (106.309643061, 2.541856444), (97.946894022, -0.179403782))
            ThreePointArc((97.946894022, -0.179403782), (101.622165605, -2.103854793), (105.71739849, -2.767330875))
            ThreePointArc((105.71739849, -2.767330875), (101.192410266, -5.584137657), (95.863287335, -5.685959414))
            ThreePointArc((95.863287335, -5.685959414), (97.475971718, -8.374084711), (100.418171986, -9.45585461))
            ThreePointArc((100.418171986, -9.45585461), (92.088505389, -10.899131081), (83.758838792, -9.45585461))
        make_face()
    extrude(amount=-CUT_EXTRUDE7_DEPTH, mode=Mode.SUBTRACT)

    # Sketch28 → Cut-Extrude8 (cut)
    with BuildSketch(Plane(origin=(0, 0, 0), x_dir=(1, 0, 0), z_dir=(0, 1, 0))):
        with Locations(Location((-107.28325, 76.2, 0), (0, 0, 270))):
            Circle(SKETCH28_R)
        with Locations(Location((-53.641625, 76.2, 0), (0, 0, 270))):
            Circle(SKETCH28_R)
        with Locations(Location((0, 76.2, 0), (0, 0, 270))):
            Circle(SKETCH28_R)
        with Locations(Location((53.641625, 76.2, 0), (0, 0, 270))):
            Circle(SKETCH28_R)
        with Locations(Location((107.28325, 76.2, 0), (0, 0, 270))):
            Circle(SKETCH28_R)
    extrude(amount=-CUT_EXTRUDE8_DEPTH, mode=Mode.SUBTRACT)

    # Sketch29 → Cut-Extrude9 (cut)
    with BuildSketch(Plane(origin=(138.27125, 0, 0), x_dir=(0, 0, -1), z_dir=(1, 0, 0))):
        with Locations(Location((-50.8, -16.438000035, 0), (0, 0, 90))):
            Circle(SKETCH29_R)
        with Locations(Location((-73.025, -16.438000035, 0), (0, 0, 90))):
            Circle(SKETCH29_R)
    extrude(amount=-CUT_EXTRUDE9_DEPTH, mode=Mode.SUBTRACT)


solid = part.part
